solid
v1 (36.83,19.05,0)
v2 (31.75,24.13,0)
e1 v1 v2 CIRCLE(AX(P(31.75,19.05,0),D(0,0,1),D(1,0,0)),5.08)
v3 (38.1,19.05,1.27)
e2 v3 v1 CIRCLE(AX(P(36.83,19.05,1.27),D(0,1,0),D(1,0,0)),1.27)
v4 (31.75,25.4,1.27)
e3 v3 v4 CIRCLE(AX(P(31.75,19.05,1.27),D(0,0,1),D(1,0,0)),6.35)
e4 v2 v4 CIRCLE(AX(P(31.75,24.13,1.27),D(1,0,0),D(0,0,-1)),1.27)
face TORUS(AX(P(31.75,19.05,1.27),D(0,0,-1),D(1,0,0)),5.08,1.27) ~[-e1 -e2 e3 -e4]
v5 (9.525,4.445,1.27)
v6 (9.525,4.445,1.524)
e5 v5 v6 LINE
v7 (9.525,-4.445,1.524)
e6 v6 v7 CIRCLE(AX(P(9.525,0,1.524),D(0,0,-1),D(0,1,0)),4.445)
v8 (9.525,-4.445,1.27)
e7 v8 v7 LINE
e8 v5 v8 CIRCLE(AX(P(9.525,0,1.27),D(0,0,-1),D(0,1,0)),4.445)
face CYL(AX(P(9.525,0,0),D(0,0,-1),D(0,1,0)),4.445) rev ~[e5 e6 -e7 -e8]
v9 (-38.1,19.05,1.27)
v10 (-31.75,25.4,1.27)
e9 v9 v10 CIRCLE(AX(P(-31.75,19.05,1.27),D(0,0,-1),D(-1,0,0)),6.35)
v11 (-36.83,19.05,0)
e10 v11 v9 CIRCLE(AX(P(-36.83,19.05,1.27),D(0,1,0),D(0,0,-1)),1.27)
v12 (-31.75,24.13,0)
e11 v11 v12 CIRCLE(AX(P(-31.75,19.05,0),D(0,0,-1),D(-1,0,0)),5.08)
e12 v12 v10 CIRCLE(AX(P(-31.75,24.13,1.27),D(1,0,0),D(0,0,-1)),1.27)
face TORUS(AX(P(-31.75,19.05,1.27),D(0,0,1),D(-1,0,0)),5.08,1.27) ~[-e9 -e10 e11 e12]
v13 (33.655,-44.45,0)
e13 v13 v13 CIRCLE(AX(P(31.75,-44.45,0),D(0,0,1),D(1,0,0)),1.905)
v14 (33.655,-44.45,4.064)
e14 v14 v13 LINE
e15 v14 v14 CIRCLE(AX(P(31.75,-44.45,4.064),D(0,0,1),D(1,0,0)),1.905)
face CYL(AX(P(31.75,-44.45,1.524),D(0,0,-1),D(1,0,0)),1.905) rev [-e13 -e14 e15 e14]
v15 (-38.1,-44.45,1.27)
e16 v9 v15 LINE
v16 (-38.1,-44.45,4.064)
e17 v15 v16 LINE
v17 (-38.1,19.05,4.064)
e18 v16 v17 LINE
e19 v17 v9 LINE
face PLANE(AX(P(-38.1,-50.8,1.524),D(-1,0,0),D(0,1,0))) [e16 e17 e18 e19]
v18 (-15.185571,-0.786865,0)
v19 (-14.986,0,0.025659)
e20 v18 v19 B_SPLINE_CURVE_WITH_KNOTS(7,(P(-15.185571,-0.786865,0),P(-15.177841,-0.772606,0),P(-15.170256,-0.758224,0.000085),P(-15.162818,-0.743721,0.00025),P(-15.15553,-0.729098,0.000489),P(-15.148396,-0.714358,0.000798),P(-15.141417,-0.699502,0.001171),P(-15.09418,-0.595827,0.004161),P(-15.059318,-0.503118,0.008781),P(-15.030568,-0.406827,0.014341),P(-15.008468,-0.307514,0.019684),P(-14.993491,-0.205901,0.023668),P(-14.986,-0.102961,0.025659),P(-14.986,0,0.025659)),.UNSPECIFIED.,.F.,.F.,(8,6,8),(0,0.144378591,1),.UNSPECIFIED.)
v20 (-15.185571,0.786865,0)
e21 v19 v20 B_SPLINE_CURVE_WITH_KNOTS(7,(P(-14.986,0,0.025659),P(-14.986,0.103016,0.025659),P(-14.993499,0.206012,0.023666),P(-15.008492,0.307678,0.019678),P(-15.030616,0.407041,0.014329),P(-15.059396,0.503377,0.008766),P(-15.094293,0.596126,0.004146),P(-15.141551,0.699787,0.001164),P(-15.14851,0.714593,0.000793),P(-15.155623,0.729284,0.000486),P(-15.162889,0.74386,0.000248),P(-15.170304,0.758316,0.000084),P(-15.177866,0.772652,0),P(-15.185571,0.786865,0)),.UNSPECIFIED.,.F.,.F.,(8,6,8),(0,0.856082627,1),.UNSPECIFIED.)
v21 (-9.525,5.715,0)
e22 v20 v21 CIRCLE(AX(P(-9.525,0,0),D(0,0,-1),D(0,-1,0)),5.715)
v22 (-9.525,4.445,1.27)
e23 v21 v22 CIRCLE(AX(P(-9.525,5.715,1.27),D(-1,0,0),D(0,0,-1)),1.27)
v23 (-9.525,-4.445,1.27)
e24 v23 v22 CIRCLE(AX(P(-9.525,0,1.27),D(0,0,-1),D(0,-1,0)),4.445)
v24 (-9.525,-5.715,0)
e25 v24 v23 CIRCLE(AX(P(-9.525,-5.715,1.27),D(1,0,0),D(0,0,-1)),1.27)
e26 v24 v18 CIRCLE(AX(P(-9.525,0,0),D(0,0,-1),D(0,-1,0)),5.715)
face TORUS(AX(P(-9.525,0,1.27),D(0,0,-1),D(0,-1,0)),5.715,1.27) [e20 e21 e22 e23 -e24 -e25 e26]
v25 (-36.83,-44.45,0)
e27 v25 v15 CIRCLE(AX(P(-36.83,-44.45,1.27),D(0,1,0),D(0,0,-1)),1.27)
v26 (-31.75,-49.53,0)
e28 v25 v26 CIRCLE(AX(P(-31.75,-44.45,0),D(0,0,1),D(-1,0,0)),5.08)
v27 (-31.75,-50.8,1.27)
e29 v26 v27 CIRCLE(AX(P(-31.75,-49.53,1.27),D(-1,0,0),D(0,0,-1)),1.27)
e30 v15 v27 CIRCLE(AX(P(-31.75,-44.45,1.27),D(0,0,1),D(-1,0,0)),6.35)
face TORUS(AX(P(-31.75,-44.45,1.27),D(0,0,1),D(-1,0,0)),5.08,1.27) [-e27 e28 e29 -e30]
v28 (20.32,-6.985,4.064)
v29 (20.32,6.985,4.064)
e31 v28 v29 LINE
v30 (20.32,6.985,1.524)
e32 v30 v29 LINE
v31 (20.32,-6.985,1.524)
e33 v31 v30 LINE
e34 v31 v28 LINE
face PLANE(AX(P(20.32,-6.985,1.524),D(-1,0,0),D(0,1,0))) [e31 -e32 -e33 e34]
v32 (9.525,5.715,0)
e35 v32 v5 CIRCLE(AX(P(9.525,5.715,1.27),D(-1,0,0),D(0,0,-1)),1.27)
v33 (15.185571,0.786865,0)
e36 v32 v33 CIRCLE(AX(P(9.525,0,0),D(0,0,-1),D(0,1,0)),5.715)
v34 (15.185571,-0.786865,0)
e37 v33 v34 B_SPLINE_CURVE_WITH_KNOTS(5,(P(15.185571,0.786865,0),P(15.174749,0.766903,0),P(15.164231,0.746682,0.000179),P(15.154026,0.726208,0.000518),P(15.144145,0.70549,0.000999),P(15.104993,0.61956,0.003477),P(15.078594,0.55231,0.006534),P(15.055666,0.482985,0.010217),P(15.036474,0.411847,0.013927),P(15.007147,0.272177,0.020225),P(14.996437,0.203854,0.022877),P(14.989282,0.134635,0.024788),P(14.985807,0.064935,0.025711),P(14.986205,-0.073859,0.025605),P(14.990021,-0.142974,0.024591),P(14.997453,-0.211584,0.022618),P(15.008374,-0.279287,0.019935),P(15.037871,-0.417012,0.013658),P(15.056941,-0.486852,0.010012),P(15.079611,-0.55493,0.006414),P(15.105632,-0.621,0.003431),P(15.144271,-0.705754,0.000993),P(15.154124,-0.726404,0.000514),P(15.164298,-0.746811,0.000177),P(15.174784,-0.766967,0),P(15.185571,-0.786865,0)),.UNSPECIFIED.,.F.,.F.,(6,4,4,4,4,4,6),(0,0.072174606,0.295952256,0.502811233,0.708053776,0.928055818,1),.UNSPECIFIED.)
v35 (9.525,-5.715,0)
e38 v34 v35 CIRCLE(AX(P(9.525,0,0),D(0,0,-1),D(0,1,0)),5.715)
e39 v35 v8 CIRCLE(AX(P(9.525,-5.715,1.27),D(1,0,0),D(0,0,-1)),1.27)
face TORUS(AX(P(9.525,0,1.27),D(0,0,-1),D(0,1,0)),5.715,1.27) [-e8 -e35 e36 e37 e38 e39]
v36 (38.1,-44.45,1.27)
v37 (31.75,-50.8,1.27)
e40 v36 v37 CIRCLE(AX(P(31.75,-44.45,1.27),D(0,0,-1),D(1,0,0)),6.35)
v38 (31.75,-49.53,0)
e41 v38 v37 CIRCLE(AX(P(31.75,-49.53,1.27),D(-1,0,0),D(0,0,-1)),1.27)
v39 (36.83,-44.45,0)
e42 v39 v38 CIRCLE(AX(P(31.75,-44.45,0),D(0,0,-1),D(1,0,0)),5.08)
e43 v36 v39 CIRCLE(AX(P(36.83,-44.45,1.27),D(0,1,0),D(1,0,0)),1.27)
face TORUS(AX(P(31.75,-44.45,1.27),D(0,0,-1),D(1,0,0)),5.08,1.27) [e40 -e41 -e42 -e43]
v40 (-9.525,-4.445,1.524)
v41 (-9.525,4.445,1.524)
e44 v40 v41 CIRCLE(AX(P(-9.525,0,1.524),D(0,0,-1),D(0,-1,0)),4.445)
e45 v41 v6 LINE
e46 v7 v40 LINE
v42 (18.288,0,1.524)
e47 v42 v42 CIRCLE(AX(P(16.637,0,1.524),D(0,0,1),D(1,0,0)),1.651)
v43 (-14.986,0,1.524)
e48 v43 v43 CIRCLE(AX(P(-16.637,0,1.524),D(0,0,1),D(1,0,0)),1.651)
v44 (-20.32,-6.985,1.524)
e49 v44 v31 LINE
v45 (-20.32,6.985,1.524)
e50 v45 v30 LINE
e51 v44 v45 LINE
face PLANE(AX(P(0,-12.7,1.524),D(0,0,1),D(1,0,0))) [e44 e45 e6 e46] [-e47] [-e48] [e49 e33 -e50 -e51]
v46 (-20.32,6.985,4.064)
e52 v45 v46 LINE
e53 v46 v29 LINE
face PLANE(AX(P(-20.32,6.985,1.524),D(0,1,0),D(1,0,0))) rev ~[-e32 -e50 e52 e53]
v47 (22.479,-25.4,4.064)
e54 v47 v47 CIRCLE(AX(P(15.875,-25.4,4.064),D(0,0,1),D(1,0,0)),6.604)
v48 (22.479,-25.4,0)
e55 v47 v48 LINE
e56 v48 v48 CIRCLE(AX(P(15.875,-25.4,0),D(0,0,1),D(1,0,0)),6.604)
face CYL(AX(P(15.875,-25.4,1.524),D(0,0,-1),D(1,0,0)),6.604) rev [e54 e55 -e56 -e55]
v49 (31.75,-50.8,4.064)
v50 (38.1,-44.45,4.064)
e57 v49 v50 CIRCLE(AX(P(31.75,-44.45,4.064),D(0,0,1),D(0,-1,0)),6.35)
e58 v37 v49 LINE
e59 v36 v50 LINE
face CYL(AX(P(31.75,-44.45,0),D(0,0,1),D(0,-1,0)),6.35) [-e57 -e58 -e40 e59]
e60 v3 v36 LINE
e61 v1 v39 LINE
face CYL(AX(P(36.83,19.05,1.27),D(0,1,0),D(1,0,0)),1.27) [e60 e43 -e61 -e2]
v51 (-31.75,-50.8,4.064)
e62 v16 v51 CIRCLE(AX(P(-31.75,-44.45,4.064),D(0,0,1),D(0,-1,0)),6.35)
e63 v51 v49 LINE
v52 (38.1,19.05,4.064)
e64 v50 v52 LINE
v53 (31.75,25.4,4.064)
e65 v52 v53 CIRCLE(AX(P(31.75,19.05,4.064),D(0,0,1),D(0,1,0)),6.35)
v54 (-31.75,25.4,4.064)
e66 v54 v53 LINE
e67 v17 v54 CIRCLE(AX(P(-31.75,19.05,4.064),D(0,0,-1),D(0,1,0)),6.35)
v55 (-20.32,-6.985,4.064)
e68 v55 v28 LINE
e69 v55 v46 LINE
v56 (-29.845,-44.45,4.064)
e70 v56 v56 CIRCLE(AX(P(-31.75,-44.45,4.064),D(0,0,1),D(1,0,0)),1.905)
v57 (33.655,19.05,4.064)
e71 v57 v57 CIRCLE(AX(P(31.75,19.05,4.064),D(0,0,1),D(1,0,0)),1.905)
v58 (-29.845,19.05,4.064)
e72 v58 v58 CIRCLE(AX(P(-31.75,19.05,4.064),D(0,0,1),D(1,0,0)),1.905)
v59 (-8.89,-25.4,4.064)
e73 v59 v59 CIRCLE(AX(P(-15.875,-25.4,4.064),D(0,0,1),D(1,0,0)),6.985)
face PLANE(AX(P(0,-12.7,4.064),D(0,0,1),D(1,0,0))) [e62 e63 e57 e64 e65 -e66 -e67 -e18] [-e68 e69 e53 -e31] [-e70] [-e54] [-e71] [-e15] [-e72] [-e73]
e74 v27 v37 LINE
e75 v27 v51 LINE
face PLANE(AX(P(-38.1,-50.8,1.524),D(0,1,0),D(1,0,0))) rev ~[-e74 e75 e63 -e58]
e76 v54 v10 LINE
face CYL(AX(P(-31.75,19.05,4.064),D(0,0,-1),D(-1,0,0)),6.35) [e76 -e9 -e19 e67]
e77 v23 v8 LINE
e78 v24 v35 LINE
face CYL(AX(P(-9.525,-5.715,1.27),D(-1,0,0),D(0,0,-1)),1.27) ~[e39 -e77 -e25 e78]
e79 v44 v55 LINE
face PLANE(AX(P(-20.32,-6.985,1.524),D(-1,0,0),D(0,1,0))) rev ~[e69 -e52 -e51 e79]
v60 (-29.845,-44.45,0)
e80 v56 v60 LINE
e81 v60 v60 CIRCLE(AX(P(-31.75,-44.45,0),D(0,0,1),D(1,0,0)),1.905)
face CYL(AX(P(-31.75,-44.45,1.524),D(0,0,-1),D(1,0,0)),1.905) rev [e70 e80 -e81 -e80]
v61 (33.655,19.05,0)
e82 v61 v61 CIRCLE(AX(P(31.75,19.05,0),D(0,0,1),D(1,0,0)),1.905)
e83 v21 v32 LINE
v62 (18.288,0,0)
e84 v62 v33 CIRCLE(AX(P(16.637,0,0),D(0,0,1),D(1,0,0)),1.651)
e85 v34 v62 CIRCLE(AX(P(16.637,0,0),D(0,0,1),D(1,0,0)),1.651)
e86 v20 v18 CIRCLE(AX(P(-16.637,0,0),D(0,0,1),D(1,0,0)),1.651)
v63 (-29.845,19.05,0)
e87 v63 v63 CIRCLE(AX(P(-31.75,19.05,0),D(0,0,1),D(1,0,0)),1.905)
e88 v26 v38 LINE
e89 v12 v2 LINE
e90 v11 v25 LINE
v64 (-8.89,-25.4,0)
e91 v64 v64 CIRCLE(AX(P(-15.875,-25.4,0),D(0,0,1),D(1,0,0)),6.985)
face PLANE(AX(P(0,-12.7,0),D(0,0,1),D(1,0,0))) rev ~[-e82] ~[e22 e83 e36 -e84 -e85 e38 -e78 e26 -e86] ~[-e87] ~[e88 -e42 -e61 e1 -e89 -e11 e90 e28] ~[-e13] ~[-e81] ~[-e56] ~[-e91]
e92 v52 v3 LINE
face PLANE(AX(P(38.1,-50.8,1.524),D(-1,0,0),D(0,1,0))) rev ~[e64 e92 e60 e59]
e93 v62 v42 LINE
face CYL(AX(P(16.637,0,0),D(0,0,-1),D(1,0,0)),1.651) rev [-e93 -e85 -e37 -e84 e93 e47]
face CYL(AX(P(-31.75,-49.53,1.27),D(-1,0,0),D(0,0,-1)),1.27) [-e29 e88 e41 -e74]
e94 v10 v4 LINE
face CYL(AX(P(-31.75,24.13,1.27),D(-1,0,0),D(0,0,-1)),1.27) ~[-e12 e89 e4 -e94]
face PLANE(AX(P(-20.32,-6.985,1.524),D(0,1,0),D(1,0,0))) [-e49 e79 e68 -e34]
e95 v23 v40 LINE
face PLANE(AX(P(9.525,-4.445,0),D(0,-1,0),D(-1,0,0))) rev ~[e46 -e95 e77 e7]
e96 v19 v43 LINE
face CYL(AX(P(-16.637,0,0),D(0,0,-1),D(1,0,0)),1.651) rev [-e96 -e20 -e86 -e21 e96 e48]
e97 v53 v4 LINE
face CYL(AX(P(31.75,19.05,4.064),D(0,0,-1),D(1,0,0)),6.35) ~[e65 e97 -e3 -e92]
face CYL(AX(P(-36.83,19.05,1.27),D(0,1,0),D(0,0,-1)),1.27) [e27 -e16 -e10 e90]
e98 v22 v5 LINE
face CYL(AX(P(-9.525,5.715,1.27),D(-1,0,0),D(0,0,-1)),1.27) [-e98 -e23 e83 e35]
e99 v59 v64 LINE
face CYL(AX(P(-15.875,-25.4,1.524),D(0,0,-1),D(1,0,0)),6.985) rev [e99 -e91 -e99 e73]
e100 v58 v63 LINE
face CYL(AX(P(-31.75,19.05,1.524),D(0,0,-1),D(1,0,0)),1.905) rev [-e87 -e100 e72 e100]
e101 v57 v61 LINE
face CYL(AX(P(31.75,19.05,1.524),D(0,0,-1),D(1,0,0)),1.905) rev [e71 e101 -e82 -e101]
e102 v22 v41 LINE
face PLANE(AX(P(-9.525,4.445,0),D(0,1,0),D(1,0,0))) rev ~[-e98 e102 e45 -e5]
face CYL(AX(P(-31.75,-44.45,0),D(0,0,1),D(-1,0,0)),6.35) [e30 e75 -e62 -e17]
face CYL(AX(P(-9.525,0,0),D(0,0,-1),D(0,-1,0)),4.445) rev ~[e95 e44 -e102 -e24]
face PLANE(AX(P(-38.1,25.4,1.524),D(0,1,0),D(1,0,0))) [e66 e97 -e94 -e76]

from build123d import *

# Parameters (mm, degrees)
F0_W         = 76.2
F0_H         = 76.2
F0_R         = 1.905
F0_R_2       = 6.985
F0_R_3       = 6.604
F0_R_4       = 1.651
F1_DEPTH     = 1.524
F2_W         = 76.2
F2_H         = 76.2
F2_R         = 1.905
F2_W_2       = 40.64
F2_H_2       = 13.97
F3_DEPTH     = 2.54
F4_R         = 6.35
F5_T1_DEPTH  = 19.05
F5_T3_DEPTH  = 63.5
F5_T5_DEPTH  = 63.5
F5_T8_ANGLE  = 90
F5_T10_ANGLE = 90
F5_T12_ANGLE = 90
F5_T14_ANGLE = 90
F5_T16_ANGLE = 180
F5_T18_ANGLE = 180
F6_DEPTH     = 2.54


# Not quite as in the source:
# - a fillet or chamfer that OpenCascade refuses, or shapes differently, is made with other operations: its cross-section is extruded or revolved along the edge and cut away or added
# - a feature names something its author has since deleted; it is built from what else it names


with BuildPart() as f1:
    # F0 (on Top) → F1 (new body)
    with BuildSketch(Plane.XY):
        with Locations((0, -12.7)):
            Rectangle(F0_W, F0_H)
        with Locations((-31.75, -44.45)):
            Circle(F0_R, mode=Mode.SUBTRACT)
        with Locations((-15.875, -25.4)):
            Circle(F0_R_2, mode=Mode.SUBTRACT)
        with Locations((31.75, -44.45)):
            Circle(F0_R, mode=Mode.SUBTRACT)
        with Locations((15.875, -25.4)):
            Circle(F0_R_3, mode=Mode.SUBTRACT)
        with Locations((-16.637, 0)):
            Circle(F0_R_4, mode=Mode.SUBTRACT)
        with Locations((-31.75, 19.05)):
            Circle(F0_R, mode=Mode.SUBTRACT)
        with BuildLine():
            ThreePointArc((-9.525, -4.445), (-13.97, 0), (-9.525, 4.445))
            Line((-9.525, 4.445), (9.525, 4.445))
            ThreePointArc((9.525, 4.445), (13.97, 0), (9.525, -4.445))
            Line((9.525, -4.445), (-9.525, -4.445))
        make_face(mode=Mode.SUBTRACT)
        with Locations((16.637, 0)):
            Circle(F0_R_4, mode=Mode.SUBTRACT)
        with Locations((31.75, 19.05)):
            Circle(F0_R, mode=Mode.SUBTRACT)
    extrude(amount=F1_DEPTH)

    # F2 (on face) → F3 (join)
    with BuildSketch(Plane.XY.offset(1.524)):
        with Locations((0, -12.7)):
            Rectangle(F2_W, F2_H)
        with Locations((-31.75, -44.45)):
            Circle(F2_R, mode=Mode.SUBTRACT)
        with Locations((31.75, -44.45)):
            Circle(F2_R, mode=Mode.SUBTRACT)
        with Locations((-31.75, 19.05)):
            Circle(F2_R, mode=Mode.SUBTRACT)
        Rectangle(F2_W_2, F2_H_2, mode=Mode.SUBTRACT)
        with Locations((31.75, 19.05)):
            Circle(F2_R, mode=Mode.SUBTRACT)
    extrude(amount=F3_DEPTH)

    # F4
    f4_edges = [f1.edges().sort_by_distance(p)[0] for p in [
        (-38.1, -50.8, 2.032),
        (38.1, -50.8, 2.032),
        (-38.1, 25.4, 2.032),
        (38.1, 25.4, 2.032),
    ]]
    fillet(f4_edges, radius=F4_R)

    # F5: fillet of radius 1.27 on 12 edges, made by hand

    # F5_s2 → F5_t1 (cut)
    with BuildSketch(Plane.YZ.offset(-9.525)):
        with BuildLine():
            ThreePointArc((5.715, 0), (4.8169743879, 0.3719743879), (4.445, 1.27))
            Line((4.445, 1.27), (4.445, 0))
            Line((4.445, 0), (5.715, 0))
        make_face()
        with BuildLine():
            ThreePointArc((-5.715, 0), (-4.8169743879, 0.3719743879), (-4.445, 1.27))
            Line((-4.445, 1.27), (-4.445, 0))
            Line((-4.445, 0), (-5.715, 0))
        make_face()
    extrude(amount=F5_T1_DEPTH, mode=Mode.SUBTRACT)

    # F5_s4 → F5_t3 (cut)
    with BuildSketch(Plane.XZ.offset(-19.05)):
        with BuildLine():
            ThreePointArc((38.1, 1.27), (37.7280256121, 0.3719743879), (36.83, 0))
            Line((36.83, 0), (38.1, 0))
            Line((38.1, 0), (38.1, 1.27))
        make_face()
        with BuildLine():
            ThreePointArc((-36.83, 0), (-37.7280256121, 0.3719743879), (-38.1, 1.27))
            Line((-38.1, 1.27), (-38.1, 0))
            Line((-38.1, 0), (-36.83, 0))
        make_face()
    extrude(amount=F5_T3_DEPTH, mode=Mode.SUBTRACT)

    # F5_s6 → F5_t5 (cut)
    with BuildSketch(Plane.YZ.offset(-31.75)):
        with BuildLine():
            ThreePointArc((-49.53, 0), (-50.4280256121, 0.3719743879), (-50.8, 1.27))
            Line((-50.8, 1.27), (-50.8, 0))
            Line((-50.8, 0), (-49.53, 0))
        make_face()
        with BuildLine():
            ThreePointArc((24.13, 0), (25.0280256121, 0.3719743879), (25.4, 1.27))
            Line((25.4, 1.27), (25.4, 0))
            Line((25.4, 0), (24.13, 0))
        make_face()
    extrude(amount=F5_T5_DEPTH, mode=Mode.SUBTRACT)

    # F5_s7 → F5_t8 (revolve, cut)
    with BuildSketch(Plane.XZ.offset(44.45)):
        with BuildLine():
            ThreePointArc((-36.83, 0), (-37.7280256121, 0.3719743879), (-38.1, 1.27))
            Line((-38.1, 1.27), (-38.1, 0))
            Line((-38.1, 0), (-36.83, 0))
        make_face()
    revolve(axis=Axis((-31.75, -44.45, 0), (0, 0, 1)), revolution_arc=F5_T8_ANGLE, mode=Mode.SUBTRACT)

    # F5_s9 → F5_t10 (revolve, cut)
    with BuildSketch(Plane.XZ.offset(44.45)):
        with BuildLine():
            ThreePointArc((38.1, 1.27), (37.7280256121, 0.3719743879), (36.83, 0))
            Line((36.83, 0), (38.1, 0))
            Line((38.1, 0), (38.1, 1.27))
        make_face()
    revolve(axis=Axis((31.75, -44.45, 0), (0, 0, -1)), revolution_arc=F5_T10_ANGLE, mode=Mode.SUBTRACT)

    # F5_s11 → F5_t12 (revolve, cut)
    with BuildSketch(Plane.XZ.offset(-19.05)):
        with BuildLine():
            ThreePointArc((38.1, 1.27), (37.7280256121, 0.3719743879), (36.83, 0))
            Line((36.83, 0), (38.1, 0))
            Line((38.1, 0), (38.1, 1.27))
        make_face()
    revolve(axis=Axis((31.75, 19.05, 0), (0, 0, 1)), revolution_arc=F5_T12_ANGLE, mode=Mode.SUBTRACT)

    # F5_s13 → F5_t14 (revolve, cut)
    with BuildSketch(Plane.XZ.offset(-19.05)):
        with BuildLine():
            ThreePointArc((-36.83, 0), (-37.7280256121, 0.3719743879), (-38.1, 1.27))
            Line((-38.1, 1.27), (-38.1, 0))
            Line((-38.1, 0), (-36.83, 0))
        make_face()
    revolve(axis=Axis((-31.75, 19.05, 0), (0, 0, -1)), revolution_arc=F5_T14_ANGLE, mode=Mode.SUBTRACT)

    # F5_s15 → F5_t16 (revolve, cut)
    with BuildSketch(Plane.YZ.offset(-9.525)):
        with BuildLine():
            ThreePointArc((-5.715, 0), (-4.8169743879, 0.3719743879), (-4.445, 1.27))
            Line((-4.445, 1.27), (-4.445, 0))
            Line((-4.445, 0), (-5.715, 0))
        make_face()
    revolve(axis=Axis((-9.525, 0, 0), (0, 0, -1)), revolution_arc=F5_T16_ANGLE, mode=Mode.SUBTRACT)

    # F5_s17 → F5_t18 (revolve, cut)
    with BuildSketch(Plane.YZ.offset(9.525)):
        with BuildLine():
            ThreePointArc((5.715, 0), (4.8169743879, 0.3719743879), (4.445, 1.27))
            Line((4.445, 1.27), (4.445, 0))
            Line((4.445, 0), (5.715, 0))
        make_face()
    revolve(axis=Axis((9.525, 0, 0), (0, 0, -1)), revolution_arc=F5_T18_ANGLE, mode=Mode.SUBTRACT)

    # F6 (cut, through all): faces of the model
    f6_faces = [f1.faces().sort_by_distance(p)[0] for p in [
        (15.875, -25.4, 1.524),
        (-15.875, -25.4, 1.524),
    ]]
    extrude(f6_faces, amount=-F6_DEPTH, mode=Mode.SUBTRACT)


solid = f1.part
